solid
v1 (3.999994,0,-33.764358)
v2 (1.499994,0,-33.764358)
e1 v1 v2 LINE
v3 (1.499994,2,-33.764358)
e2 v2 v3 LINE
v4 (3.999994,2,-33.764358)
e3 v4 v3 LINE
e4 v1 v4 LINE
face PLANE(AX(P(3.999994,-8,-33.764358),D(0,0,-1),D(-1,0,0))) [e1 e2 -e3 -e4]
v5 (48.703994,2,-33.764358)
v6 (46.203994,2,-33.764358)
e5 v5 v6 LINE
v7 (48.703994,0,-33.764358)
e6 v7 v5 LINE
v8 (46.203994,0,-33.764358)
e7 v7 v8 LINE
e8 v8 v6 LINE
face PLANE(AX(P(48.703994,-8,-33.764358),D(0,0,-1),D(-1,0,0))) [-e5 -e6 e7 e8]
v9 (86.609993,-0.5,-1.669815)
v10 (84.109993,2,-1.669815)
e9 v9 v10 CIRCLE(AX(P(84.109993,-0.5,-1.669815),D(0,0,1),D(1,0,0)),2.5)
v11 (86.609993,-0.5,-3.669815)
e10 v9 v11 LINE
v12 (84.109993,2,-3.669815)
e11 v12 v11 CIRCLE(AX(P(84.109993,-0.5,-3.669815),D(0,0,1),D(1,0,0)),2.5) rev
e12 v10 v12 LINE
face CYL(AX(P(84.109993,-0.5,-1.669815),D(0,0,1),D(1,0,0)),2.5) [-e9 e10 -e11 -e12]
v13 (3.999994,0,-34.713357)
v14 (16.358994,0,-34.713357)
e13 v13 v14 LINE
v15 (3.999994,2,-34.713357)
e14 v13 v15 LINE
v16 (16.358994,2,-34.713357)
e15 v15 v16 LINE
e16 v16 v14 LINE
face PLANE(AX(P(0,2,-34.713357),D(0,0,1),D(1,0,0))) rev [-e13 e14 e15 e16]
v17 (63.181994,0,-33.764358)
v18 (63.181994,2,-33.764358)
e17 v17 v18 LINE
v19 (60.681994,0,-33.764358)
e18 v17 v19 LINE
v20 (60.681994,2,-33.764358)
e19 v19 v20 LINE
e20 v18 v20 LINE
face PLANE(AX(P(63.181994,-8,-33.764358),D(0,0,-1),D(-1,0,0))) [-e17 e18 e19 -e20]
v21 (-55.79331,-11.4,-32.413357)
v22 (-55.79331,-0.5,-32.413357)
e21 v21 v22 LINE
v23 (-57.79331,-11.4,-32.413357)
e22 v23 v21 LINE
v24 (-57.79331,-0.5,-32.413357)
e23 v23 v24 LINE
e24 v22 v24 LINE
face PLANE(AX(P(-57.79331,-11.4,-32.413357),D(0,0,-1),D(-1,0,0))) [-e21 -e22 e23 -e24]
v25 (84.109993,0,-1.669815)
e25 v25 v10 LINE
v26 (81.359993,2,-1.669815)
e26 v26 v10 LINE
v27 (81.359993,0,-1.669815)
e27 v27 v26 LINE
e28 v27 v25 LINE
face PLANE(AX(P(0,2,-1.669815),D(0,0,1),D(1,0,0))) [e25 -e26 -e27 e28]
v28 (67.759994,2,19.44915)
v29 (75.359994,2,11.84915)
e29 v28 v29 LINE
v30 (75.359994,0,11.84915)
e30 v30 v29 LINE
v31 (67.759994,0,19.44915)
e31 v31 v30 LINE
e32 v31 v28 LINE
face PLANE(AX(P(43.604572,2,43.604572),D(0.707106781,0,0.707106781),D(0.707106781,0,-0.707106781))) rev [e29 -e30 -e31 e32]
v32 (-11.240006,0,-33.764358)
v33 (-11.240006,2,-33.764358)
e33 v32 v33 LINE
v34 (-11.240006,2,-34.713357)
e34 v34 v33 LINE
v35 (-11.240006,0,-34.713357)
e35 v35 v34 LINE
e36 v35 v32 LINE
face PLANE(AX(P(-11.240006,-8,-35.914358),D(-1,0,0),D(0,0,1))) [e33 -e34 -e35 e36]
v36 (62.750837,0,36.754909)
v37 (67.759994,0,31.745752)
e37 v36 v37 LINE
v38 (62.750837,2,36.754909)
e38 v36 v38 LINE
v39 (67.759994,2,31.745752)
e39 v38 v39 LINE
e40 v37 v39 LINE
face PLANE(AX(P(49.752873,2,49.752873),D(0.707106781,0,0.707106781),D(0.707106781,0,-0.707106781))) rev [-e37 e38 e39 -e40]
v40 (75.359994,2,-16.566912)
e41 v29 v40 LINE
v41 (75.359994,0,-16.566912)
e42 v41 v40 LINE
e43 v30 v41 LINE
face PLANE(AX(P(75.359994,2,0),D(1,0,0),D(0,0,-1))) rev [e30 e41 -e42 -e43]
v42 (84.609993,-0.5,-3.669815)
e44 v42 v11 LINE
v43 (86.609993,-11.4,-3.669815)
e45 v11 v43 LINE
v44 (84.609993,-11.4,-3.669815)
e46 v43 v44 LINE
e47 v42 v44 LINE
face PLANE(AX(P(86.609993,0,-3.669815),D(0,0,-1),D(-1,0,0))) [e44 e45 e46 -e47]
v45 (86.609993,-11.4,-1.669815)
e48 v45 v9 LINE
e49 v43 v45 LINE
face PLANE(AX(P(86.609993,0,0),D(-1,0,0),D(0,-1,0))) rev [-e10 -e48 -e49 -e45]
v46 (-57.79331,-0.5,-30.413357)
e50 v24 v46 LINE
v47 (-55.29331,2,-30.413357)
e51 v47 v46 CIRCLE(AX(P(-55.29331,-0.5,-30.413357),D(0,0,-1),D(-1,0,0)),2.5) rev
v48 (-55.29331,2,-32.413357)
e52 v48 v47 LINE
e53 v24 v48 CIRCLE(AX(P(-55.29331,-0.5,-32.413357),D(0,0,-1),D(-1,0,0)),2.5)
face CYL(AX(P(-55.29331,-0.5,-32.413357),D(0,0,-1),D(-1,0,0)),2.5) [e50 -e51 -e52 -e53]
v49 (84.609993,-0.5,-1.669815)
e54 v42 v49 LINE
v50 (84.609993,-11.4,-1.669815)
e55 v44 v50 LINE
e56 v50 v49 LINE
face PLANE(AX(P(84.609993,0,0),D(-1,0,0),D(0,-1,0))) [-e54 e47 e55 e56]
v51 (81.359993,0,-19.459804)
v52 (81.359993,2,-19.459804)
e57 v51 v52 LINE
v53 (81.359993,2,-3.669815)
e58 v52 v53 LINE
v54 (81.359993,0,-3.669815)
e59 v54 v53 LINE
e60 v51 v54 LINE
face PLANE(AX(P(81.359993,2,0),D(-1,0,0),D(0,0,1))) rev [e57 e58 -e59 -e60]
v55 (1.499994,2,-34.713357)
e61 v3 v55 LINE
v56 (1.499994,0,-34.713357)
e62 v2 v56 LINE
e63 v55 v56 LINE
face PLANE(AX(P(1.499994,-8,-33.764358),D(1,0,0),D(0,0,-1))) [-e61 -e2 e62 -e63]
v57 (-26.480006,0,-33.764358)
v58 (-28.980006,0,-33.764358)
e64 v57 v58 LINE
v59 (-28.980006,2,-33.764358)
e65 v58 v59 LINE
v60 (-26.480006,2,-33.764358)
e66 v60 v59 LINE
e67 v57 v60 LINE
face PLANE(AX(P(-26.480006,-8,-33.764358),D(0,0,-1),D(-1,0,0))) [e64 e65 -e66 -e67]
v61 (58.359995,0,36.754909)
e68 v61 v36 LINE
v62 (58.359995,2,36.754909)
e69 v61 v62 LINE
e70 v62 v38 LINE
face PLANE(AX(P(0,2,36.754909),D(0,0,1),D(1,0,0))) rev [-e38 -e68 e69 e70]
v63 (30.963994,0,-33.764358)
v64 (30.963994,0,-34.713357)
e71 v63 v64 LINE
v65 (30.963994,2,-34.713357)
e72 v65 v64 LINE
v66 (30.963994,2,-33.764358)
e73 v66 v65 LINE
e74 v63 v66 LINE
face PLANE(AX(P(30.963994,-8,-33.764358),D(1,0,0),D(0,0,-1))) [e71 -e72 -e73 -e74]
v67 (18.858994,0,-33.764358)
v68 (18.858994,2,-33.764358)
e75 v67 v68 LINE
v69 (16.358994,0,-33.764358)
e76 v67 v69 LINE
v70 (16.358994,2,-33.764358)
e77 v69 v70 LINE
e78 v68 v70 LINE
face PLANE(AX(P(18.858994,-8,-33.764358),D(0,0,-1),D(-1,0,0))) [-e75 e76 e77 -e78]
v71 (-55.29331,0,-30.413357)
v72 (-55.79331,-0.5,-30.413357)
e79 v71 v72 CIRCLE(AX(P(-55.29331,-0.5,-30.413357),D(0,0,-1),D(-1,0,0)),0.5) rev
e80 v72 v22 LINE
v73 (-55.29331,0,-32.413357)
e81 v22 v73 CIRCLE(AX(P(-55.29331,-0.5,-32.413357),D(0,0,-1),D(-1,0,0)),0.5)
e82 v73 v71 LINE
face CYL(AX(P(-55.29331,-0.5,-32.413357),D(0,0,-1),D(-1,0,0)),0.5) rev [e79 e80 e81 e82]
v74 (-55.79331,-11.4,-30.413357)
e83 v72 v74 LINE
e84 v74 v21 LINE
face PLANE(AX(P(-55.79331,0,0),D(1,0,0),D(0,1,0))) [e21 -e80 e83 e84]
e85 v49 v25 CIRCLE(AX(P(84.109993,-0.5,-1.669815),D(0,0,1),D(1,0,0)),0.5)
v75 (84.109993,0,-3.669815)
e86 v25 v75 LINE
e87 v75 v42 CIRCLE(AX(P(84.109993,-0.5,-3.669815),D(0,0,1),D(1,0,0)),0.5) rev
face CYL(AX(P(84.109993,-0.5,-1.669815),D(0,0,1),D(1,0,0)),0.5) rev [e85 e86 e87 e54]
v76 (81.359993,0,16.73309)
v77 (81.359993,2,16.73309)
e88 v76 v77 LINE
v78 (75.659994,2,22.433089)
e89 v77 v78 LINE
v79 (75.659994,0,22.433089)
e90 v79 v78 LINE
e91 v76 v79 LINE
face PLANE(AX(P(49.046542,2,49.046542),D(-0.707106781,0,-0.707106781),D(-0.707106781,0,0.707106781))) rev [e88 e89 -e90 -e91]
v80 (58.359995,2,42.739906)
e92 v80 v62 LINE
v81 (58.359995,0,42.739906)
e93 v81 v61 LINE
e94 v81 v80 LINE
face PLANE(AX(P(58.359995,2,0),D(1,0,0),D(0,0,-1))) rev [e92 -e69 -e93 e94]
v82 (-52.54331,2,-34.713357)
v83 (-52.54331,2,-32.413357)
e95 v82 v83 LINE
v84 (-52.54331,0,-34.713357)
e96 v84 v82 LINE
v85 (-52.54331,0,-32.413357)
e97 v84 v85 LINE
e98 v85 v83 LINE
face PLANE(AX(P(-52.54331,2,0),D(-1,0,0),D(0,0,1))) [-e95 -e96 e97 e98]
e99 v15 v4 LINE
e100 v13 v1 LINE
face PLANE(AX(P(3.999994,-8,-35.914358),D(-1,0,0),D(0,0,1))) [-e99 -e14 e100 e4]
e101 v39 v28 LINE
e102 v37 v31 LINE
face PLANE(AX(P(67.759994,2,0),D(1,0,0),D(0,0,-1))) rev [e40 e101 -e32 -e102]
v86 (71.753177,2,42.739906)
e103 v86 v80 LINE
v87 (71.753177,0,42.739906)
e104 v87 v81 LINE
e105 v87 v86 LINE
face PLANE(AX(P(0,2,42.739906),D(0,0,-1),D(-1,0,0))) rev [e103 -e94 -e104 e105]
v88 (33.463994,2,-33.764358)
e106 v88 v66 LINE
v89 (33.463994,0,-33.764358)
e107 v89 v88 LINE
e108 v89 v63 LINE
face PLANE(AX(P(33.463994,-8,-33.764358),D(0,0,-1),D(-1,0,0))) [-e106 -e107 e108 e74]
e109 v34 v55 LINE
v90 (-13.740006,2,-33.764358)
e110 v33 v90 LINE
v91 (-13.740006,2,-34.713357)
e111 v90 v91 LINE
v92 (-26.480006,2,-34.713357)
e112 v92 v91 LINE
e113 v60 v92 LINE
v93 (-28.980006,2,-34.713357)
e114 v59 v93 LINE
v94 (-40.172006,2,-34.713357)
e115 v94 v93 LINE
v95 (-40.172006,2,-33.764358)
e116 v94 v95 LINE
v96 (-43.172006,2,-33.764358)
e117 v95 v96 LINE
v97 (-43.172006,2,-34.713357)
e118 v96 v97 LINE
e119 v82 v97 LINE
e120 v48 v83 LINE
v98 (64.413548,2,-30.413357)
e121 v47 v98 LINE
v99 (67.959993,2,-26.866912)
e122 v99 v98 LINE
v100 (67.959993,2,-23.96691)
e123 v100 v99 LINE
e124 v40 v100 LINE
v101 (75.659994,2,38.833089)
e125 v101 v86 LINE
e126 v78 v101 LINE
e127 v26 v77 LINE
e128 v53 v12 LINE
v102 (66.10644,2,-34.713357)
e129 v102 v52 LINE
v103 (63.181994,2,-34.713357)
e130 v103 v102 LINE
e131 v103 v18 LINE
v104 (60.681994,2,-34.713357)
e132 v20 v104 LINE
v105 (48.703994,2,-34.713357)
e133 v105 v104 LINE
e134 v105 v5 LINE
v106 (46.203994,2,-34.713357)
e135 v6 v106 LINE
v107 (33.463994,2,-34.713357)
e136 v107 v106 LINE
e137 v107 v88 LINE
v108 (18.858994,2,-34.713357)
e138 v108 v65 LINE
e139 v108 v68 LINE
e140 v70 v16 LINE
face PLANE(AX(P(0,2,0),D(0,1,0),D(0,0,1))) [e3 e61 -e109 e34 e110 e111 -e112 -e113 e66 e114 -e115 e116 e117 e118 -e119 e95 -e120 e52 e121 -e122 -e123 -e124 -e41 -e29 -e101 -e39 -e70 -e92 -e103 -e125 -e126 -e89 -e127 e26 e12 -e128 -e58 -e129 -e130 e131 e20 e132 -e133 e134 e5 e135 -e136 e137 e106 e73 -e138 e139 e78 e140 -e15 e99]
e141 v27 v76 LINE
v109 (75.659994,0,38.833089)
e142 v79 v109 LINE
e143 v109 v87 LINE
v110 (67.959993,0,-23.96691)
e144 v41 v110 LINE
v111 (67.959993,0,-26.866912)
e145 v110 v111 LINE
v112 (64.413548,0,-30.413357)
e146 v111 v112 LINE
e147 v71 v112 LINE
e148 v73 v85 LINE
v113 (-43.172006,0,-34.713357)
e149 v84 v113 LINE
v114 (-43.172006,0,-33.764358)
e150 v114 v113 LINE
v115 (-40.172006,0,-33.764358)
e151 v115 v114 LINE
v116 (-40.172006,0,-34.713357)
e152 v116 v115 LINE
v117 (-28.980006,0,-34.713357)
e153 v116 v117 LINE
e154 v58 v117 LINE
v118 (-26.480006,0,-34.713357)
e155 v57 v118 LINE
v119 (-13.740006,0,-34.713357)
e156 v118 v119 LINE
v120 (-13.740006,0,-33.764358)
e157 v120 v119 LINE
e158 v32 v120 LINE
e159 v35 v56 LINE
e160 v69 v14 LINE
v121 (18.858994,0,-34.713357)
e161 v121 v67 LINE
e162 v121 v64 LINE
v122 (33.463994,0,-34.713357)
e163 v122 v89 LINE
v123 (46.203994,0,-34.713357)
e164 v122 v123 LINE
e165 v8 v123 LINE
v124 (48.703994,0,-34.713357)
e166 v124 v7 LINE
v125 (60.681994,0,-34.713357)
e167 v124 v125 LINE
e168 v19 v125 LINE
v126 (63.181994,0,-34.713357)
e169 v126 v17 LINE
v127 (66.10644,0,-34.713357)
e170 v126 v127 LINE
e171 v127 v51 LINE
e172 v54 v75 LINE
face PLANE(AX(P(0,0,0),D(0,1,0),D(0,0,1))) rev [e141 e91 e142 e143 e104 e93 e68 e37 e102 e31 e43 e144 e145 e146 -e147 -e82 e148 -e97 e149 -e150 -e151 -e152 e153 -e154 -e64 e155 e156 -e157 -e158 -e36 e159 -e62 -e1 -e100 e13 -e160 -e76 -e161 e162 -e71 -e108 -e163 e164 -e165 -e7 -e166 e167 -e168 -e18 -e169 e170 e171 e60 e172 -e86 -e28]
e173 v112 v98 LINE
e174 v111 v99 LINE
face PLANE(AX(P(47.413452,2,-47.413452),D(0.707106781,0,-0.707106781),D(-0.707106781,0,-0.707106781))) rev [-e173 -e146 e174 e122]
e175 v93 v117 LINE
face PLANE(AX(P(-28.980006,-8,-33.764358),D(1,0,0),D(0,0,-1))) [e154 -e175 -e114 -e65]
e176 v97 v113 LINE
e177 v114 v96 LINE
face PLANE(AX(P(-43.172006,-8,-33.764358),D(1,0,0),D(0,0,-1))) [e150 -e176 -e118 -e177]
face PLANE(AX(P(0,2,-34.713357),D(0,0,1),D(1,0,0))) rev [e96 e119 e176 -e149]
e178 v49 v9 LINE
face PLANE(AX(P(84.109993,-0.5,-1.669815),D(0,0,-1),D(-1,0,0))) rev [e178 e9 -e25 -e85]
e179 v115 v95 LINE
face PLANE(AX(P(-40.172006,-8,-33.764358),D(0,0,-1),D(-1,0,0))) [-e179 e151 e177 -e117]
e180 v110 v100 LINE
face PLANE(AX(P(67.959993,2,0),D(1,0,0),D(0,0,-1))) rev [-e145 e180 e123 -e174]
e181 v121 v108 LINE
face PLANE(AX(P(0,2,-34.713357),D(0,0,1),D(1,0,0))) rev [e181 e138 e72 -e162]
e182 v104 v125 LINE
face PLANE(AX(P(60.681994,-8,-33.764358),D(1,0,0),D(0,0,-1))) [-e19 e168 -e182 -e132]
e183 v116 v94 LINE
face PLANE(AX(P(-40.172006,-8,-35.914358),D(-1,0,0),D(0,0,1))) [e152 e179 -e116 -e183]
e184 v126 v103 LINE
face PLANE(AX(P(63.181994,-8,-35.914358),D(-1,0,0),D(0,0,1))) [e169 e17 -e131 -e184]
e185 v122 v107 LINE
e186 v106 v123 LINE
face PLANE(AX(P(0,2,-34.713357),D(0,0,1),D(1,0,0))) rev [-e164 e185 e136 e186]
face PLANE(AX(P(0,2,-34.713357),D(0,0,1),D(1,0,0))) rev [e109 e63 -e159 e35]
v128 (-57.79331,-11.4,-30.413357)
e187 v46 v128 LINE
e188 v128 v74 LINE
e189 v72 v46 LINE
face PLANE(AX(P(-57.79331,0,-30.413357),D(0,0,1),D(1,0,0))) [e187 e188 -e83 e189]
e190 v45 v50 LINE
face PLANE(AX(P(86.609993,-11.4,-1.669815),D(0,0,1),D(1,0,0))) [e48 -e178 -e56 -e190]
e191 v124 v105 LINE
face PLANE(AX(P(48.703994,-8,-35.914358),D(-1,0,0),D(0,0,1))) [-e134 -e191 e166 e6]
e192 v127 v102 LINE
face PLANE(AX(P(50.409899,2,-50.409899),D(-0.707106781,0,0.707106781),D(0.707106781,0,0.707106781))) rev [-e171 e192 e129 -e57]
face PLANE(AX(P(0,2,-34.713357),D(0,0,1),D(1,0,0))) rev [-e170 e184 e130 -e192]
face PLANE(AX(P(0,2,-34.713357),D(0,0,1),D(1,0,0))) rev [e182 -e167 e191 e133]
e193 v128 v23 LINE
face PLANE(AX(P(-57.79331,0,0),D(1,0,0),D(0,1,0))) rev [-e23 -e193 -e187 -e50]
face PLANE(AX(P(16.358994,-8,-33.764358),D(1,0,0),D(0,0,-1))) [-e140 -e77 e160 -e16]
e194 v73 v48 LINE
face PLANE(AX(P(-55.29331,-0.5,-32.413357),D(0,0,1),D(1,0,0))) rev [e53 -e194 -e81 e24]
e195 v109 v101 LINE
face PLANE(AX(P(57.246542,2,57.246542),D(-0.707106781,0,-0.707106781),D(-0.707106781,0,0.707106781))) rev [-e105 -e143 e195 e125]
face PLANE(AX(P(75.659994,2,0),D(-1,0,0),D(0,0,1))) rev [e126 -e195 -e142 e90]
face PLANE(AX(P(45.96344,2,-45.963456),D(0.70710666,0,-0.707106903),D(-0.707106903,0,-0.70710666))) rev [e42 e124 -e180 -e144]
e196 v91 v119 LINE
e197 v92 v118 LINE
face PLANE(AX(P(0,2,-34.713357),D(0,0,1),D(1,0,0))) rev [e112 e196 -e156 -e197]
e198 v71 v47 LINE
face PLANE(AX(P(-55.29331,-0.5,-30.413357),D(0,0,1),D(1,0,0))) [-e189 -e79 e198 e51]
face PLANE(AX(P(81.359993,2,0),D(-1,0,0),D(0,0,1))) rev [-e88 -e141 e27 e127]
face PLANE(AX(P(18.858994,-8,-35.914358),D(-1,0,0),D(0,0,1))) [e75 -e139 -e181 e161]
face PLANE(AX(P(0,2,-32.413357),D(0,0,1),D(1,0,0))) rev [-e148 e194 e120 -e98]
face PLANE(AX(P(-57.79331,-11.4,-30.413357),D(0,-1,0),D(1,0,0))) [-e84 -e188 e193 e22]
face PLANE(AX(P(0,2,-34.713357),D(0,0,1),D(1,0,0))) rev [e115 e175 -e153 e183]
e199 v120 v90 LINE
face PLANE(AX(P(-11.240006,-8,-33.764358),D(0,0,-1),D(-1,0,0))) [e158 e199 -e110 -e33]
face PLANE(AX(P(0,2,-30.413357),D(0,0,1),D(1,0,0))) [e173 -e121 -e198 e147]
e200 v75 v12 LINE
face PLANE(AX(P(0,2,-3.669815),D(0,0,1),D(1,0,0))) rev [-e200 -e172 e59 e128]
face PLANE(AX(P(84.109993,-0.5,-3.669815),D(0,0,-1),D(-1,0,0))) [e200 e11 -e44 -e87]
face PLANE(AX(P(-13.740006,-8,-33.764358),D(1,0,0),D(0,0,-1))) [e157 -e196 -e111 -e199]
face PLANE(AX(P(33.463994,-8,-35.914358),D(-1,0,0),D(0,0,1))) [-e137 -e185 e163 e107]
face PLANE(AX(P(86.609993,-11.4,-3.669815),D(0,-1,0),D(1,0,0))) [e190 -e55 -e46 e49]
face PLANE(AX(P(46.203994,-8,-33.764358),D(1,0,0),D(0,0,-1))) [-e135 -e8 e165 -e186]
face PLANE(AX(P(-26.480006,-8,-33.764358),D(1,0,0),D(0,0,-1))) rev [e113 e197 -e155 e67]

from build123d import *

# Parameters (mm, degrees)
BOSS_EXTRUDE1_DEPTH = 2
EDGE_FLANGE1_DEPTH  = 2
EDGE_FLANGE2_DEPTH  = 2
SKETCH13_W          = 2.5
SKETCH13_H          = 2.15
SKETCH13_W_2        = 3
CUT_EXTRUDE3_DEPTH  = 10


# Sheet-metal steps are written as plain solids
with BuildPart() as part:
    # Sketch2 → Boss-Extrude1 (new body)
    with BuildSketch(Plane(origin=(0, 0, 0), x_dir=(1, 0, 0), z_dir=(0, 1, 0))):
        Polygon((-52.543309772, 32.413356753), (-54.793309772, 32.413356753), (-54.793309772, 30.413356753), (64.413548219, 30.413356753), (67.959993108, 26.866911863), (67.959993108, 23.966910068), (75.359993548, 16.566912168), (75.359993548, -11.849150158), (67.759993508, -19.449150198), (67.759993508, -31.745752353), (62.750836838, -36.754909023), (58.359994528, -36.754909023), (58.359994528, -42.739906444), (71.753176861, -42.739906444), (75.659994488, -38.833088817), (75.659994488, -22.433088597), (81.359993248, -16.733089837), (81.359993248, 1.669814581), (83.609993248, 1.669814581), (83.609993248, 3.669814581), (81.359993248, 3.669814581), (81.359993248, 19.459804242), (66.106440177, 34.713357313), (-52.543309772, 34.713357313), align=None)
    extrude(amount=BOSS_EXTRUDE1_DEPTH)

    # Edge-Flange1 section (across the edge) → Edge-Flange1 (add)
    with BuildSketch(Plane(origin=(-55.793309772, 0, -30.413356753), x_dir=(1, 0, 0), z_dir=(0, 0, -1))):
        with BuildLine():
            Line((-2, 0.5), (-2, 11.4))
            Line((-2, 11.4), (0, 11.4))
            Line((0, 11.4), (0, 0.5))
            ThreePointArc((0, 0.5), (0.146446609, 0.146446609), (0.5, 0))
            Line((0.5, 0), (1, 0))
            Line((1, 0), (1, -2))
            Line((1, -2), (0.5, -2))
            ThreePointArc((0.5, -2), (-1.267766953, -1.267766953), (-2, 0.5))
        make_face()
    extrude(amount=EDGE_FLANGE1_DEPTH)

    # Edge-Flange2 section (across the edge) → Edge-Flange2 (add)
    with BuildSketch(Plane(origin=(84.609993248, 0, -3.669814581), x_dir=(-1, 0, 0), z_dir=(0, 0, 1))):
        with BuildLine():
            Line((-2, 0.5), (-2, 11.4))
            Line((-2, 11.4), (0, 11.4))
            Line((0, 11.4), (0, 0.5))
            ThreePointArc((0, 0.5), (0.146446609, 0.146446609), (0.5, 0))
            Line((0.5, 0), (1, 0))
            Line((1, 0), (1, -2))
            Line((1, -2), (0.5, -2))
            ThreePointArc((0.5, -2), (-1.267766953, -1.267766953), (-2, 0.5))
        make_face()
    extrude(amount=EDGE_FLANGE2_DEPTH)

    # Sketch13 → Cut-Extrude3 (cut)
    with BuildSketch(Plane(origin=(0, 2, 0), x_dir=(1, 0, 0), z_dir=(0, 1, 0))):
        with Locations((-27.730006168, 34.839358373)):
            Rectangle(SKETCH13_W, SKETCH13_H)
        with Locations((-41.672006168, 34.839358373)):
            Rectangle(SKETCH13_W_2, SKETCH13_H)
        with Locations((-12.490006168, 34.839358373)):
            Rectangle(SKETCH13_W, SKETCH13_H)
        with Locations((2.749993832, 34.839358373)):
            Rectangle(SKETCH13_W, SKETCH13_H)
        with Locations((17.608993832, 34.839358373)):
            Rectangle(SKETCH13_W, SKETCH13_H)
        with Locations((32.213993832, 34.839358373)):
            Rectangle(SKETCH13_W, SKETCH13_H)
        with Locations((47.453993832, 34.839358373)):
            Rectangle(SKETCH13_W, SKETCH13_H)
        with Locations((61.931993832, 34.839358373)):
            Rectangle(SKETCH13_W, SKETCH13_H)
    extrude(amount=-CUT_EXTRUDE3_DEPTH, mode=Mode.SUBTRACT)


solid = part.part
